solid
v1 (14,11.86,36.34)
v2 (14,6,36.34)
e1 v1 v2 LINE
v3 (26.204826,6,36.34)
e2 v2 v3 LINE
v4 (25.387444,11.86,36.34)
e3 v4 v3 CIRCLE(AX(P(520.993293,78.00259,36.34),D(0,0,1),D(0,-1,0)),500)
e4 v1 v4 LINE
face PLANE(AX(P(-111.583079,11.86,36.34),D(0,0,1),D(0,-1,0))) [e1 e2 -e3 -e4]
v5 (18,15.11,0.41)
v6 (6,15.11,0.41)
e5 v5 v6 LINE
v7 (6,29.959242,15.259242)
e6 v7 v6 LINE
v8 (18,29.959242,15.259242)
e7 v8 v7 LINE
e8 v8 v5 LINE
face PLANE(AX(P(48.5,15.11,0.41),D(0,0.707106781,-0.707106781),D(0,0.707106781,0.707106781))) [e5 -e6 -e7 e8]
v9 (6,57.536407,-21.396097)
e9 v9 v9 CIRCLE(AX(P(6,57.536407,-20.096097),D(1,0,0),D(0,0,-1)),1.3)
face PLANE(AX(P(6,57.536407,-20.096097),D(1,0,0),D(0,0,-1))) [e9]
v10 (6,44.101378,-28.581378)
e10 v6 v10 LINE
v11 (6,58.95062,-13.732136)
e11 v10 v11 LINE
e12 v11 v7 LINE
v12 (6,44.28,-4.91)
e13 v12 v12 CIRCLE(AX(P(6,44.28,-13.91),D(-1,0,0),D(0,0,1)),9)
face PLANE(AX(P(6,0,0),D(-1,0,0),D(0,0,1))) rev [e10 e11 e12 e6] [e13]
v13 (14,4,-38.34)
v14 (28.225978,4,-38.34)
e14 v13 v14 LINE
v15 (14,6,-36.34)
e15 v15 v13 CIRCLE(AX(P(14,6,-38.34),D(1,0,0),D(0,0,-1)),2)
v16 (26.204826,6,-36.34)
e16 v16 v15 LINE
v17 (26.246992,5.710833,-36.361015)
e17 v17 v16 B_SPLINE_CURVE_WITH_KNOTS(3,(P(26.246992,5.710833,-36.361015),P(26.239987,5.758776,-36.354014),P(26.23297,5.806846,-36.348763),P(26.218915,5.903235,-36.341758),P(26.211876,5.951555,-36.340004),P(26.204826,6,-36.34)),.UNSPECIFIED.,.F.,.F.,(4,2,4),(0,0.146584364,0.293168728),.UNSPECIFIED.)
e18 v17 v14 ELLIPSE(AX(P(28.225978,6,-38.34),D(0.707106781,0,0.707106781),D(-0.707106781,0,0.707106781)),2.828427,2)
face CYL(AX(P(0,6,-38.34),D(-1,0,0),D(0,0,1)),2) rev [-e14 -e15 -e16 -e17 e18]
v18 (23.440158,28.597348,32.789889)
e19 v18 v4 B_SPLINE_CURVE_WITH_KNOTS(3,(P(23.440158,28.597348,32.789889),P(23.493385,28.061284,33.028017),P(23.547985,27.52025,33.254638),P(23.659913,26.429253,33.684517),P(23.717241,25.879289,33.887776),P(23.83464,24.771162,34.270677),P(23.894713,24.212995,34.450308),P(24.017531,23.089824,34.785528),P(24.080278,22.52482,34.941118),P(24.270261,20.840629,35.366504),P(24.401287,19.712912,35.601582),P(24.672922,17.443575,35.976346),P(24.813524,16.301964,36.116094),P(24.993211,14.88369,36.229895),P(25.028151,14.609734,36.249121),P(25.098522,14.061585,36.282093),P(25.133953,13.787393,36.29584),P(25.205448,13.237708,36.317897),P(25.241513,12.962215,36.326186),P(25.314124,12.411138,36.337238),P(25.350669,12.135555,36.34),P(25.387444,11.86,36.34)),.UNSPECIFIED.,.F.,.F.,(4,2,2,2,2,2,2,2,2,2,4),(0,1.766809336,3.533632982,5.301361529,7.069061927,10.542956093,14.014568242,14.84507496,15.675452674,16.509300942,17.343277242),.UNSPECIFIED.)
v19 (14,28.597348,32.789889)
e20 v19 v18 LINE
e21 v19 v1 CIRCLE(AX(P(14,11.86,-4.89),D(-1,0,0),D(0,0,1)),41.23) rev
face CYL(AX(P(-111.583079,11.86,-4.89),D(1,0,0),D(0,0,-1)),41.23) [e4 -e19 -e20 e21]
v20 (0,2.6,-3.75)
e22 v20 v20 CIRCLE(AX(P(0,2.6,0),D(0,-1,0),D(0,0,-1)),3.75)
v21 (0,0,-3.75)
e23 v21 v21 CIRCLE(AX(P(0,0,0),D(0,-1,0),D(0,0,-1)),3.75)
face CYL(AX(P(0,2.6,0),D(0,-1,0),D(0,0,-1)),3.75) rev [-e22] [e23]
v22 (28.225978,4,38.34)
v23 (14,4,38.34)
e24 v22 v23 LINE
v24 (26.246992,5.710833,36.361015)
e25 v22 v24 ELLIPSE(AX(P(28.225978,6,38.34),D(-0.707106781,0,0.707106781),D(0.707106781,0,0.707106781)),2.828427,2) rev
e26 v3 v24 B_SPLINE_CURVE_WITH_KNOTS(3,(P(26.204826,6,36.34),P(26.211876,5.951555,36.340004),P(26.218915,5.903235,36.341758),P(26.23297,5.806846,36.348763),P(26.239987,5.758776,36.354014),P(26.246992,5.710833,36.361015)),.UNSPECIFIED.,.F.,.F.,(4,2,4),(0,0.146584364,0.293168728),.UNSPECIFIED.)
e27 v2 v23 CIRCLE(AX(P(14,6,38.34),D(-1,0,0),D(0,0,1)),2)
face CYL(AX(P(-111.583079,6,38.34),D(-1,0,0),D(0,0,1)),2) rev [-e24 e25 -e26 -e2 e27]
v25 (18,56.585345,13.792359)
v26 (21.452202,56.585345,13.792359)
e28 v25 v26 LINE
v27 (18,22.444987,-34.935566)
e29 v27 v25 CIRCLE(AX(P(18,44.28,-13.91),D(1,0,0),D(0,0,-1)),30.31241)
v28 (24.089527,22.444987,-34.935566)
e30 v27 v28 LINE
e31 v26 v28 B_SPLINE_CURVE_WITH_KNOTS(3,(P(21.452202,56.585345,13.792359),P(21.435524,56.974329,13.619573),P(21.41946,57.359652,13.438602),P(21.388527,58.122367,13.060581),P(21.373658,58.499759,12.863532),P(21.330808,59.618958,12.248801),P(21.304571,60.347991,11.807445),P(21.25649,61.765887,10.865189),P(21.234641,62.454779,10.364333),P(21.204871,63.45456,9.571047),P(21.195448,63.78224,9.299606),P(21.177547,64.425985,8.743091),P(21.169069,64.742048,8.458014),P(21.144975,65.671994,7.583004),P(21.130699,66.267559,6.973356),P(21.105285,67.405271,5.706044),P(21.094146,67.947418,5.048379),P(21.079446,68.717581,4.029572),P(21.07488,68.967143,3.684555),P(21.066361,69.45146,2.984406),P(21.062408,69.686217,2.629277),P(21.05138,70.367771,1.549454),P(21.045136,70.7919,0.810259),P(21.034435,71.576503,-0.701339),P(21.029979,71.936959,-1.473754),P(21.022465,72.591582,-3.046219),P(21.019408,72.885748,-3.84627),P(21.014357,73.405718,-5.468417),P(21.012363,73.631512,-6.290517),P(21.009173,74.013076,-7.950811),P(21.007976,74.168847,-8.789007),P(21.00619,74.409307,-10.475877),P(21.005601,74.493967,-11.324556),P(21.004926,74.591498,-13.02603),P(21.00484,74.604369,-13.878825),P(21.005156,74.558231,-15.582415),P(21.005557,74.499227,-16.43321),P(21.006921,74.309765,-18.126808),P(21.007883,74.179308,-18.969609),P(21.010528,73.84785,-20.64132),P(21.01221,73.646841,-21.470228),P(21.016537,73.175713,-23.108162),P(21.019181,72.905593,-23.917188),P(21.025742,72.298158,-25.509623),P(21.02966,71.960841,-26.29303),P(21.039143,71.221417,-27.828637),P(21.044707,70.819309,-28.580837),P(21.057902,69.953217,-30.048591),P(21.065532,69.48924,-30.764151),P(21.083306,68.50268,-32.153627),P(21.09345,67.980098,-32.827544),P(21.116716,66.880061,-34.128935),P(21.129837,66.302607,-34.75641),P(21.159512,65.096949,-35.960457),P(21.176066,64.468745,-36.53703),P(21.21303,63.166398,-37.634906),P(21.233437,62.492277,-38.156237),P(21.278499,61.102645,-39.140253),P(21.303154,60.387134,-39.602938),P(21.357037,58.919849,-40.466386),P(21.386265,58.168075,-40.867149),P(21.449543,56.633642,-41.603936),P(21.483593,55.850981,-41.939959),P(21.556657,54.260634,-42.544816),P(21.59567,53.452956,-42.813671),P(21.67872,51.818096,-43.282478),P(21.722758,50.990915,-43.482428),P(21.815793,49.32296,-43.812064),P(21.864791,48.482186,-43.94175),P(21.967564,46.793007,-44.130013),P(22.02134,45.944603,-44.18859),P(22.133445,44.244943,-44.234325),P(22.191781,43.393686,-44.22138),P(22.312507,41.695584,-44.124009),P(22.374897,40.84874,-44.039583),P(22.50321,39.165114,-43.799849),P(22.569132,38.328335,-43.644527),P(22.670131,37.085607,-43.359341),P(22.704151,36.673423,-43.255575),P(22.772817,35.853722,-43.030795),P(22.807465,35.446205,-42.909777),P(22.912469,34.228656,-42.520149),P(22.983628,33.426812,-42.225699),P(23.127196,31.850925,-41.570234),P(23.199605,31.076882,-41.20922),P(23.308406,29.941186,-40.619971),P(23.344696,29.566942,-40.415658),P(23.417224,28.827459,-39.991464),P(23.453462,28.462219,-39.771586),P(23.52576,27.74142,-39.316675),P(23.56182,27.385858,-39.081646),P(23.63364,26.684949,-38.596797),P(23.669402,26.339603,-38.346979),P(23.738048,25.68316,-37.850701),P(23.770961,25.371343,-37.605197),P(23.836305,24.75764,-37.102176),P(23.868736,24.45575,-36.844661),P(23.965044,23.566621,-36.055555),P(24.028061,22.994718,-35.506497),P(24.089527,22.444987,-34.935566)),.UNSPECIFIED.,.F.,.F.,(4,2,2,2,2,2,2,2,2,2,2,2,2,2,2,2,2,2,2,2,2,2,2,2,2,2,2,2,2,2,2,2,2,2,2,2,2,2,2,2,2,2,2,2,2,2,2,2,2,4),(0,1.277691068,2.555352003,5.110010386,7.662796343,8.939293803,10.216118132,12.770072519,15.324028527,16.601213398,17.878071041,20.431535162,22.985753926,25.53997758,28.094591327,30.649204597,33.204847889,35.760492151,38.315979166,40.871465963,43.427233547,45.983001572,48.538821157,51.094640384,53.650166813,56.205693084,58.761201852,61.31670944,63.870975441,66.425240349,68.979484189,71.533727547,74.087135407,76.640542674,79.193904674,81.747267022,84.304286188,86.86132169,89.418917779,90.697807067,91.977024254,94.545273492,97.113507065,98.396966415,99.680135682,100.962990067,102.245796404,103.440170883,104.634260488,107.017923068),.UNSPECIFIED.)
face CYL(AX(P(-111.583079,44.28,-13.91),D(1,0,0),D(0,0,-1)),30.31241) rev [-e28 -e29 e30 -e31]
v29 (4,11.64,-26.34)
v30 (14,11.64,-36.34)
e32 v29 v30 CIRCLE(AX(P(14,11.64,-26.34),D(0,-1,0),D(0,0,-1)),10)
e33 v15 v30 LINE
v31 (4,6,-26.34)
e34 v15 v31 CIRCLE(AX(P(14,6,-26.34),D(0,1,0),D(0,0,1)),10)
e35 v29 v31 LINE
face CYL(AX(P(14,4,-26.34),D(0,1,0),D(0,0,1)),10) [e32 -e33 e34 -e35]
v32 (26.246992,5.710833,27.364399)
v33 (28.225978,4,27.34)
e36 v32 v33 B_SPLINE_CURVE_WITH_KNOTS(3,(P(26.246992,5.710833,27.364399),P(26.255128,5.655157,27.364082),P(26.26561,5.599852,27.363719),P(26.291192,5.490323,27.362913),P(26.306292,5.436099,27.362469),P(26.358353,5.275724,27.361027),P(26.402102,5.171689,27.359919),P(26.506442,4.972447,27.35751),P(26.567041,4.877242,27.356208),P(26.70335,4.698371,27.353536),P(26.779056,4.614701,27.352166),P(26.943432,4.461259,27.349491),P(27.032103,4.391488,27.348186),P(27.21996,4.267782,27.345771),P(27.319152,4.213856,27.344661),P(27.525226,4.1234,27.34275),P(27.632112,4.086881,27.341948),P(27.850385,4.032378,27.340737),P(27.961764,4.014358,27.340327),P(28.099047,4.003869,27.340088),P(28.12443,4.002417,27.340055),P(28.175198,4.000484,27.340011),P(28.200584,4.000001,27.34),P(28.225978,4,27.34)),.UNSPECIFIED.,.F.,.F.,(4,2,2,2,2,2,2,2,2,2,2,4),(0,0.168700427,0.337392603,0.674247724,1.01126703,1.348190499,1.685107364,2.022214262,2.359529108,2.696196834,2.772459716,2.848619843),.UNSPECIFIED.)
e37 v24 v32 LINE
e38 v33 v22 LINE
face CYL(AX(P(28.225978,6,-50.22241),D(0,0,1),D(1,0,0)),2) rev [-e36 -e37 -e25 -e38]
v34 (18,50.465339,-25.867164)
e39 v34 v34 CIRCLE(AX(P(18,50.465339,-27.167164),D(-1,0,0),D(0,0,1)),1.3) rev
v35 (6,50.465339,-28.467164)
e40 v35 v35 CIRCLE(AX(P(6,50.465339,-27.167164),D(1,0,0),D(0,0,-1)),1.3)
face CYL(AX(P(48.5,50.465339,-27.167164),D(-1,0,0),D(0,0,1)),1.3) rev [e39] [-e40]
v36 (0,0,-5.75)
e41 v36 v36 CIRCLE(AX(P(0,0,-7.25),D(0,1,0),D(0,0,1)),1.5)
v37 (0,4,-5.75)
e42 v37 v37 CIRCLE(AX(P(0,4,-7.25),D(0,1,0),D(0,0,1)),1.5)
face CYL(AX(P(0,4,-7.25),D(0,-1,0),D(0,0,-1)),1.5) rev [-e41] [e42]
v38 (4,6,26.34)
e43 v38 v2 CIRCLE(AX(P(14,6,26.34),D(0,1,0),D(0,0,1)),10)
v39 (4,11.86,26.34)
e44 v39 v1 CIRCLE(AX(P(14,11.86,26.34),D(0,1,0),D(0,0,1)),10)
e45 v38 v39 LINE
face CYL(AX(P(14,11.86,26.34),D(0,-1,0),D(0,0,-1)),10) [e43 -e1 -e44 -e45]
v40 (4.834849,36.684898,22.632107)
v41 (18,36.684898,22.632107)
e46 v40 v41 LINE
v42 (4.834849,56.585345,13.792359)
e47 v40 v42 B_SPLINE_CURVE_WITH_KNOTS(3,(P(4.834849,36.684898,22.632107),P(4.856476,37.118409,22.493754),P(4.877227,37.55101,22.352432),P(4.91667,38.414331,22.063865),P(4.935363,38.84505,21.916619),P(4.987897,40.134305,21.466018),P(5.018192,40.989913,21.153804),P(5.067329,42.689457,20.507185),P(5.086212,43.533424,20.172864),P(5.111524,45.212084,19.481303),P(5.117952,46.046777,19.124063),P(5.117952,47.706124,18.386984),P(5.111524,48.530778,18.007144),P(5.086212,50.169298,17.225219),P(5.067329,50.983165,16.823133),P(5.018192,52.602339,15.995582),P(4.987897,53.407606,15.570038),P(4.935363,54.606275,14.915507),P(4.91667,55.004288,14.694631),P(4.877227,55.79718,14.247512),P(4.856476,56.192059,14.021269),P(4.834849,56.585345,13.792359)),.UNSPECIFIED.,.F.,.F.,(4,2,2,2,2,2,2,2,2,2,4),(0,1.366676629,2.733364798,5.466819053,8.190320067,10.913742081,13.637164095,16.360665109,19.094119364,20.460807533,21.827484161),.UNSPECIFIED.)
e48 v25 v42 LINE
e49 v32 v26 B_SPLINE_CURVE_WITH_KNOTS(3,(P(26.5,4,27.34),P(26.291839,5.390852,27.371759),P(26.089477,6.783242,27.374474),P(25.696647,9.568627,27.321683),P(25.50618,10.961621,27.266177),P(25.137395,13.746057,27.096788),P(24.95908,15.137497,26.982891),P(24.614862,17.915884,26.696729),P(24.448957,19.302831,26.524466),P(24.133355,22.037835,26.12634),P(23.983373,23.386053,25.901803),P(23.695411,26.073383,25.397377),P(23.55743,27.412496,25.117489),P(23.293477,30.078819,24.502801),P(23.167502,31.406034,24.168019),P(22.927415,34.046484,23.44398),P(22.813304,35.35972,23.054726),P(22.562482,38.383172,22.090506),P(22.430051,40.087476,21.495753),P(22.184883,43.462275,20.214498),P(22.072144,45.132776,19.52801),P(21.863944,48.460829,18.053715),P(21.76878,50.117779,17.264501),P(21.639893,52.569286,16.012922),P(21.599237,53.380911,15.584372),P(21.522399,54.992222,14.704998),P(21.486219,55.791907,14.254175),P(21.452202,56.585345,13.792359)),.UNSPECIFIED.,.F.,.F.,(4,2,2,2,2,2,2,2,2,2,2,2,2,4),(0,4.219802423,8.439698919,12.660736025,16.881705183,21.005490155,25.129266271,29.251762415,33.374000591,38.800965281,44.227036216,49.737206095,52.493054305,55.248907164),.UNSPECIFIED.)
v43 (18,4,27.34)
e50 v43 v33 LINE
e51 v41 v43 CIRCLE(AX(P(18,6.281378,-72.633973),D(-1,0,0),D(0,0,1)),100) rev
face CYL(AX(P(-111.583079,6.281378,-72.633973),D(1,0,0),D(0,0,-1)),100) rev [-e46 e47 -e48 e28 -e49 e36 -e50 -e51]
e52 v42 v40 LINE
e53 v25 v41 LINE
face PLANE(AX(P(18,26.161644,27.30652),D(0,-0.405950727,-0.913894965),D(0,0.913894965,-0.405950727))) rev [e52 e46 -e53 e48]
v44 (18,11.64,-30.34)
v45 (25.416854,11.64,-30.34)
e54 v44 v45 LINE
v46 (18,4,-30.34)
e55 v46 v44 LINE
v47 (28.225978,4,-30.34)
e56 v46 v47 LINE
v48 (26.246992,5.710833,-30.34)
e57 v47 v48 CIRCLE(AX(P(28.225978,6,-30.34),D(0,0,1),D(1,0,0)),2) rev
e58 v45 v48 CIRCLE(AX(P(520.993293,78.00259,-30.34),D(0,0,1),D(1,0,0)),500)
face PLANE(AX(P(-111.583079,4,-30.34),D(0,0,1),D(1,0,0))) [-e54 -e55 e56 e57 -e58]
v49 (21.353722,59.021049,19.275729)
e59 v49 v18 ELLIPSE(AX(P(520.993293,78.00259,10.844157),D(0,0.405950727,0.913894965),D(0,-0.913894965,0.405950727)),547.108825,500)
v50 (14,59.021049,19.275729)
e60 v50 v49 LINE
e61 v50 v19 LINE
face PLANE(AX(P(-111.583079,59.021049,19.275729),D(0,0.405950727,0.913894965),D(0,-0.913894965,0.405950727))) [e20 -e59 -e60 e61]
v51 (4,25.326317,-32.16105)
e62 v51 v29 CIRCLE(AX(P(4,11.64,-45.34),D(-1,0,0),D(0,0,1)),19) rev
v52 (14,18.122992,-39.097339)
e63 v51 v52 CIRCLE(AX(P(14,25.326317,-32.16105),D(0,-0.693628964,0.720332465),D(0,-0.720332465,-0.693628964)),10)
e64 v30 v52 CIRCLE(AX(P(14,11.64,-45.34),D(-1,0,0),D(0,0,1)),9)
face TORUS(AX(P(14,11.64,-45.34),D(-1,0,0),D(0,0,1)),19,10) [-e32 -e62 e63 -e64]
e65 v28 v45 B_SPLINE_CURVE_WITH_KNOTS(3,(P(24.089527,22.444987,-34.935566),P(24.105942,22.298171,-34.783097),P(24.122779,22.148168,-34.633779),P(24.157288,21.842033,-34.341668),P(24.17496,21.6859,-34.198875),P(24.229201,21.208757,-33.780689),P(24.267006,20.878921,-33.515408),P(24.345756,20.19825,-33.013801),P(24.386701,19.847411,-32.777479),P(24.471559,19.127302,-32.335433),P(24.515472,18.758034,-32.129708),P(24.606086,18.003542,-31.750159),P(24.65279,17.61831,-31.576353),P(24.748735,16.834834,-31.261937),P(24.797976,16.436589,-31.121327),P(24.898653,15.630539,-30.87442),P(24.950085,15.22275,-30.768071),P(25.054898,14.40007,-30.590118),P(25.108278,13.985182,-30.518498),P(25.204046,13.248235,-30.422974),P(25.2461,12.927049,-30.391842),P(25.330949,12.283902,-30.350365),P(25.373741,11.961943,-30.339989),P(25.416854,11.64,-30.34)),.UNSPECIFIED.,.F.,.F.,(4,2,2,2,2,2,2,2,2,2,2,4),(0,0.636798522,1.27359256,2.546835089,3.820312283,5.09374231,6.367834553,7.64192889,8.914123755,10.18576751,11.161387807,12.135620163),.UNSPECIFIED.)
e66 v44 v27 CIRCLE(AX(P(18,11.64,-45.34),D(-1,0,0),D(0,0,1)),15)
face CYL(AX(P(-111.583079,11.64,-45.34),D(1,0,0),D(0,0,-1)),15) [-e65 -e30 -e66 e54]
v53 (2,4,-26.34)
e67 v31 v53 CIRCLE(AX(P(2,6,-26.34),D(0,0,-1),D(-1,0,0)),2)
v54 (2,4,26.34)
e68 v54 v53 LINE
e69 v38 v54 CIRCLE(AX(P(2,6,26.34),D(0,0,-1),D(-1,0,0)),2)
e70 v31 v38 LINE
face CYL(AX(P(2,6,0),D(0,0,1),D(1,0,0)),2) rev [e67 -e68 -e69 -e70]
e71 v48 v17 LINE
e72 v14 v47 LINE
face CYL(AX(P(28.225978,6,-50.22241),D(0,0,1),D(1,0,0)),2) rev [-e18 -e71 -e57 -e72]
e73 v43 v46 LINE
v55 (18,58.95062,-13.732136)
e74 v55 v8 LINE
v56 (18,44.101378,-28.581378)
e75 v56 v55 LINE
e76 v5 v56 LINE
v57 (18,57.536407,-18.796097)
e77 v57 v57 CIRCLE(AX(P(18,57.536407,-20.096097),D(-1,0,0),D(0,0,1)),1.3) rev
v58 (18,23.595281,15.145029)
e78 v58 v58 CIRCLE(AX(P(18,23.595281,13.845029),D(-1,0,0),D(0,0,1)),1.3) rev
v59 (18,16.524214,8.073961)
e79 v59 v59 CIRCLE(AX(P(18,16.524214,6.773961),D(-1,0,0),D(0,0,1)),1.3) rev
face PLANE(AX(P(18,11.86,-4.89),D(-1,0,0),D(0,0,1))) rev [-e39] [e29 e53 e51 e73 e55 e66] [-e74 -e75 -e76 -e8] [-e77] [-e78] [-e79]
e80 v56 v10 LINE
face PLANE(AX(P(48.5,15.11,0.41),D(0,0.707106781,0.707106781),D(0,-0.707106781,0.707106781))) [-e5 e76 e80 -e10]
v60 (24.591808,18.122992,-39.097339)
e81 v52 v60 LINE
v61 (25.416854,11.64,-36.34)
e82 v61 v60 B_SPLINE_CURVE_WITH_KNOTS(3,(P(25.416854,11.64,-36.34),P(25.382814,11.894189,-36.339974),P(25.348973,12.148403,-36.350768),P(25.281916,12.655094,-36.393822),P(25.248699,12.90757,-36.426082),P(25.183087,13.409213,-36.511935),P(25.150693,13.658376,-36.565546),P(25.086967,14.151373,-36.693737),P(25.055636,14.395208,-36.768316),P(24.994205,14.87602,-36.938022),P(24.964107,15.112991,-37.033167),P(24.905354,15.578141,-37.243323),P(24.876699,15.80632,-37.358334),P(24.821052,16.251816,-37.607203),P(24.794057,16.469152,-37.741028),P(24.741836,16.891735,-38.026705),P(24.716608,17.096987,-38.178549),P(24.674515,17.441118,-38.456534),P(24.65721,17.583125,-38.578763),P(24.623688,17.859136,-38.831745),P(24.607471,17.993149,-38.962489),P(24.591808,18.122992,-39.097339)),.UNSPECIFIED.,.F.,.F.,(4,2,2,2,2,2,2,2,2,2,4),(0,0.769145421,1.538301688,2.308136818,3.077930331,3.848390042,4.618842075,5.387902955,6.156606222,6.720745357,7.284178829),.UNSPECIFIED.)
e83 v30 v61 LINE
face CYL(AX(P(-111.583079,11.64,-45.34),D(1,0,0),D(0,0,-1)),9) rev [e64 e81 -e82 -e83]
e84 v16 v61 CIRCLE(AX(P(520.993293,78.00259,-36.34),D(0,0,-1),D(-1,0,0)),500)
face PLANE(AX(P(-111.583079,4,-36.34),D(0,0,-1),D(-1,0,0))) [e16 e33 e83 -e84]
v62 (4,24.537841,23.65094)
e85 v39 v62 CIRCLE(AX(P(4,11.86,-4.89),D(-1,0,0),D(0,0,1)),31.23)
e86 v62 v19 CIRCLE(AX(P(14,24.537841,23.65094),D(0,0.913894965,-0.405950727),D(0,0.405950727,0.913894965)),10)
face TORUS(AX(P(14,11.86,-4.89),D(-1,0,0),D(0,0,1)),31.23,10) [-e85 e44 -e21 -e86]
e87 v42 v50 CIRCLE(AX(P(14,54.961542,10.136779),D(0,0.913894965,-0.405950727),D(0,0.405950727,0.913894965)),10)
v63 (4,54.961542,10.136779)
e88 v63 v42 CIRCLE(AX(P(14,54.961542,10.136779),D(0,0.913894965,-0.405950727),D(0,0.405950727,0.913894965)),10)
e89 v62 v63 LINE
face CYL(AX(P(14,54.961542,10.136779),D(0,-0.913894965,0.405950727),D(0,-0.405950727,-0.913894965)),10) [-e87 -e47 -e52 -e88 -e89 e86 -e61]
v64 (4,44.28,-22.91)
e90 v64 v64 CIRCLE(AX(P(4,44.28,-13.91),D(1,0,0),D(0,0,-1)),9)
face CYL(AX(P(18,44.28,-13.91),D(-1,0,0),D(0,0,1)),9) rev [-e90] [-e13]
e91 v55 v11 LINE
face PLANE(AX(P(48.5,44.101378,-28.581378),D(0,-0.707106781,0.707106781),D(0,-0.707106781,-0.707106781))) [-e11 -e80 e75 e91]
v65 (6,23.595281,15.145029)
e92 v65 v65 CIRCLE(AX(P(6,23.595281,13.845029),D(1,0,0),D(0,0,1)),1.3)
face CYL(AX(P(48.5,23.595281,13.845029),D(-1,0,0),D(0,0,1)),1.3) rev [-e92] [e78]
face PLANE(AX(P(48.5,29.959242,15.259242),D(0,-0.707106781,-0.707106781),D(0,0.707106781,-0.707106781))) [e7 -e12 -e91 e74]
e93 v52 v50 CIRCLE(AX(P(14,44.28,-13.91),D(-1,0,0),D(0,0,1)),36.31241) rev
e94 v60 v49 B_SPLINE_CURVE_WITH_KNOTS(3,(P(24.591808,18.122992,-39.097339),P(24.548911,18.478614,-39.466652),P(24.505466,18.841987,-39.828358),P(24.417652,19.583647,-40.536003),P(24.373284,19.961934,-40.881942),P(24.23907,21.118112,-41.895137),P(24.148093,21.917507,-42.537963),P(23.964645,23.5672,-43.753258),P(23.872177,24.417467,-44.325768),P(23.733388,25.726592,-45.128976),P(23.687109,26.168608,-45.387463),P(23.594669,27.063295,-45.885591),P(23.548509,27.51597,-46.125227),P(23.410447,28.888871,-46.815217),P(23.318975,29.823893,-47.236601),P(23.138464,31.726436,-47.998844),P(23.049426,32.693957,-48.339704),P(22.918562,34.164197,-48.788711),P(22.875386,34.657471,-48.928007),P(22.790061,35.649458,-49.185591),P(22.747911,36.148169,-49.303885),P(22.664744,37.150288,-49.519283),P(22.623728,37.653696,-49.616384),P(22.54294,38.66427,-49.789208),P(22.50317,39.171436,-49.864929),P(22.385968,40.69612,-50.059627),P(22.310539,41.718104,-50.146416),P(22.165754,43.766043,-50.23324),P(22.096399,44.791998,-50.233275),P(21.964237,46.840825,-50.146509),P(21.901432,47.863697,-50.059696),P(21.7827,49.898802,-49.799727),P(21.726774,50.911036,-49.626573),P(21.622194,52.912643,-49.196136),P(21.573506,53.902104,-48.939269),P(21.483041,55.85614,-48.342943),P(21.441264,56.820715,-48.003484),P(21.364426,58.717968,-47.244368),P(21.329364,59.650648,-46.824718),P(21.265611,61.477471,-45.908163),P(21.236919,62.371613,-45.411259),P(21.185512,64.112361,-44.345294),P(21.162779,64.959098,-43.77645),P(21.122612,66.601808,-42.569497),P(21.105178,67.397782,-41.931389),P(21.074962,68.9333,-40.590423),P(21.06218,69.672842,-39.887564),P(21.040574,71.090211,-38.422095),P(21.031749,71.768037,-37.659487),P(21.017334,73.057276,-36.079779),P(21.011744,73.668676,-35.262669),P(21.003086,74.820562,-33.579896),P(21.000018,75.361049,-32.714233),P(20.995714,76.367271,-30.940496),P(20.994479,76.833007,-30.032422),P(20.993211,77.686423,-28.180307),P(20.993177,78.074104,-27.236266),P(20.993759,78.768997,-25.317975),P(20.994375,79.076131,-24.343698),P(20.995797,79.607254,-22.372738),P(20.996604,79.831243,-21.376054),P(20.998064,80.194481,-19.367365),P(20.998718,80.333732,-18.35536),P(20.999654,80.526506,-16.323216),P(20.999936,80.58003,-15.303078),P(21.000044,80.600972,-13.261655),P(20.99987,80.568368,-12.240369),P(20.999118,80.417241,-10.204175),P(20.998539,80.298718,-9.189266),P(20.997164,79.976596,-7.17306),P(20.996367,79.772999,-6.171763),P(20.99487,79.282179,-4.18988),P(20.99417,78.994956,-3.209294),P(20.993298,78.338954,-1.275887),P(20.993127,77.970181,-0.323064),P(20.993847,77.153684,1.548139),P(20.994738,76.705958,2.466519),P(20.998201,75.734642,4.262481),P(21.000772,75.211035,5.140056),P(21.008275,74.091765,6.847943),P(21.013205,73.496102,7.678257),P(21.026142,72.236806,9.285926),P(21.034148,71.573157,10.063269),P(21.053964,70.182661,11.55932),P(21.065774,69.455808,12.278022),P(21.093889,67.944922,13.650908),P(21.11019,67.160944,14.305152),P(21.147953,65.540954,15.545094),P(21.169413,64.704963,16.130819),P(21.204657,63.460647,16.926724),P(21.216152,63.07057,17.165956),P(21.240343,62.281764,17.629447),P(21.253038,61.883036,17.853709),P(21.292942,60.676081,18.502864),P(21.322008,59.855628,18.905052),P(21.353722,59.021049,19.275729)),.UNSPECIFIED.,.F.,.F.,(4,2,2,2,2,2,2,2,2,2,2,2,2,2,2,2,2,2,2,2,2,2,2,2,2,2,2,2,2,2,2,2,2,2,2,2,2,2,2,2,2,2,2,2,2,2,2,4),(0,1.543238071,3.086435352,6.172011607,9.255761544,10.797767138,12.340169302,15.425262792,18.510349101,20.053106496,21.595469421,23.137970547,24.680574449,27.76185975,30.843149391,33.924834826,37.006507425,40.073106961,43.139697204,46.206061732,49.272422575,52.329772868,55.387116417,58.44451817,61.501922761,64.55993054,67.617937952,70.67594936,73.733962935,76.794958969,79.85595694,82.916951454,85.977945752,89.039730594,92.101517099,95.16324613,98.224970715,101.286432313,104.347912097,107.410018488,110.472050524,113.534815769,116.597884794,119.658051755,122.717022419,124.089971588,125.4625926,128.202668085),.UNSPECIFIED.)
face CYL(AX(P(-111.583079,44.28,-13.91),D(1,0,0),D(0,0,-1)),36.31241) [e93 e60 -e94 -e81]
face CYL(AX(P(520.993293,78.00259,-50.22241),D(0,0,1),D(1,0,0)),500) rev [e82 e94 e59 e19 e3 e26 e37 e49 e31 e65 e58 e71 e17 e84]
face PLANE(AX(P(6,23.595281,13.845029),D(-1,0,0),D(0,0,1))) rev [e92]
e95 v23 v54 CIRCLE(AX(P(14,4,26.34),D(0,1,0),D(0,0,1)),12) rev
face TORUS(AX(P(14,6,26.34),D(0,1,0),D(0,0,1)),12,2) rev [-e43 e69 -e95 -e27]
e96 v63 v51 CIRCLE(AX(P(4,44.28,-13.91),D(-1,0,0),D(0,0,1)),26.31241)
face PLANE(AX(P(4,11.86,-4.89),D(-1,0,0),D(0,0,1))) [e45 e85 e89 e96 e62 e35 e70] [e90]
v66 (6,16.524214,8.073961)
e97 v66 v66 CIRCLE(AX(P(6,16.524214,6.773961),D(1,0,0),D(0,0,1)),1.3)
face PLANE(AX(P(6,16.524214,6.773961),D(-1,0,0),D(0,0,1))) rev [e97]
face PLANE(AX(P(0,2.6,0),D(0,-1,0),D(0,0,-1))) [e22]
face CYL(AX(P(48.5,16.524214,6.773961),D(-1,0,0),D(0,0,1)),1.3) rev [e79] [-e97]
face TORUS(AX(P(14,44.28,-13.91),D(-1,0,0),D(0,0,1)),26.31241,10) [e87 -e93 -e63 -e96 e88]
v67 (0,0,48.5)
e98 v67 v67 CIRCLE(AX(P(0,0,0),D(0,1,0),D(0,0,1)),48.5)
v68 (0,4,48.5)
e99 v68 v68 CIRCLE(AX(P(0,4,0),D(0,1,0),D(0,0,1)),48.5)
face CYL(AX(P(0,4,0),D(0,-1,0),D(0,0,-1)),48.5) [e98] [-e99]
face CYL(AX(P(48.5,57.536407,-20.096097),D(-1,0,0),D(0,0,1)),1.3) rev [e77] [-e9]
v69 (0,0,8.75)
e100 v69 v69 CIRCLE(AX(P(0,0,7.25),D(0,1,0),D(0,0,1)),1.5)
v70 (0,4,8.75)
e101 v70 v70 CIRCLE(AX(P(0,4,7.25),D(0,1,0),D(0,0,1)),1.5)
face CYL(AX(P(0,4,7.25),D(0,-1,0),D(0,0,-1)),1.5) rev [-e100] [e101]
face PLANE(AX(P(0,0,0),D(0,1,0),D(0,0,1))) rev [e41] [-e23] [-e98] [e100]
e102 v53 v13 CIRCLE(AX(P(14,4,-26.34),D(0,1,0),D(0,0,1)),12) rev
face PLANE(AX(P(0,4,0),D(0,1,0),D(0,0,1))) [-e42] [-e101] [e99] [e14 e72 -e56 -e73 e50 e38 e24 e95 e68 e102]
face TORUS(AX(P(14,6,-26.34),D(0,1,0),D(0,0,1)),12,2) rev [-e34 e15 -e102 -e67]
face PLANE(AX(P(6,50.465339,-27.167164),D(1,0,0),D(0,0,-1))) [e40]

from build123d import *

# Parameters (mm, degrees)
SKETCH1_R                       = 48.5
SKETCH1_R_2                     = 1.5
BOSS_EXTRUDE3_DEPTH             = 4
BOSS_EXTRUDE4_START             = 4
SKETCH3_R                       = 9
BOSS_EXTRUDE4_DEPTH             = 14
CUT_EXTRUDE2_START              = 6
SKETCH5_R                       = 1.3
CUT_EXTRUDE2_DEPTH              = 96.333743786
BOSS_EXTRUDE5_DEPTH             = 9
BOSS_EXTRUDE5_DIRECTION_2_REACH = 113.079
CUT_EXTRUDE3_DEPTH              = 107.628687584
CUT_EXTRUDE3_DEPTH_BACK         = 107.628687584
FILLET1_R                       = 10
FILLET2_R                       = 2
SKETCH11_R                      = 3.75
CUT_EXTRUDE4_DEPTH              = 2.6


with BuildPart() as part:
    # Sketch1 → Boss-Extrude3 (new body)
    with BuildSketch(Plane(origin=(0, 0, 0), x_dir=(1, 0, 0), z_dir=(0, 1, 0))):
        with Locations(Location((0, 0, 0), (0, 0, 270))):
            Circle(SKETCH1_R)
        with Locations(Location((0, 7.25, 0), (0, 0, 270))):
            Circle(SKETCH1_R_2, mode=Mode.SUBTRACT)
        with Locations(Location((0, -7.25, 0), (0, 0, 270))):
            Circle(SKETCH1_R_2, mode=Mode.SUBTRACT)
    extrude(amount=BOSS_EXTRUDE3_DEPTH)

    # Sketch3 → Boss-Extrude4 (add)
    with BuildSketch(Plane(origin=(0, 0, 0), x_dir=(0, 0, -1), z_dir=(1, 0, 0)).offset(BOSS_EXTRUDE4_START)):
        with BuildLine():
            Line((30.34, 4), (-30.34, 4))
            Line((-30.34, 4), (-30.34, 11.86))
            ThreePointArc((-30.34, 11.86), (-29.573286886, 19.169908139), (-27.306519614, 26.161644128))
            Line((-27.306519614, 26.161644128), (-13.792358873, 56.58534489))
            ThreePointArc((-13.792358873, 56.58534489), (31.303559207, 69.105517077), (34.935565542, 22.444986978))
            ThreePointArc((34.935565542, 22.444986978), (31.536621485, 17.510838233), (30.34, 11.64))
            Line((30.34, 11.64), (30.34, 4))
        make_face()
        with Locations((13.91, 44.28)):
            Circle(SKETCH3_R, mode=Mode.SUBTRACT)
    extrude(amount=BOSS_EXTRUDE4_DEPTH)

    # Sketch5 → Cut-Extrude2 (cut, through all)
    with BuildSketch(Plane(origin=(0, 0, 0), x_dir=(0, 0, -1), z_dir=(1, 0, 0)).offset(CUT_EXTRUDE2_START)):
        with Locations(Location((27.167164466, 50.465339059, 0), (0, 0, 180))):
            Circle(SKETCH5_R)
        with Locations(Location((20.096096654, 57.536406871, 0), (0, 0, 180))):
            Circle(SKETCH5_R)
        with Locations(Location((-6.773961031, 16.524213562, 0), (0, 0, 180))):
            Circle(SKETCH5_R)
        with Locations(Location((-13.845028843, 23.595281374, 0), (0, 0, 180))):
            Circle(SKETCH5_R)
        Polygon((-0.41, 15.11), (28.581378029, 44.101378029), (13.732135624, 58.950620434), (-15.259242405, 29.959242405), align=None)
    extrude(amount=CUT_EXTRUDE2_DEPTH, mode=Mode.SUBTRACT)

    # Sketch9 → Boss-Extrude5 (add)
    with BuildSketch(Plane(origin=(18, 0, 0), x_dir=(0, 0, -1), z_dir=(1, 0, 0))):
        with BuildLine():
            Line((30.34, 4), (30.34, 11.64))
            ThreePointArc((30.34, 11.64), (31.536621485, 17.510838233), (34.935565542, 22.444986978))
            ThreePointArc((34.935565542, 22.444986978), (31.303559207, 69.105517077), (-13.792358873, 56.58534489))
            ThreePointArc((-13.792358873, 56.58534489), (-24.20389685, 31.229863028), (-27.34, 4))
            Line((-27.34, 4), (-36.34, 4))
            Line((-36.34, 4), (-36.34, 11.86))
            ThreePointArc((-36.34, 11.86), (-35.442708439, 20.414854175), (-32.789889403, 28.597348492))
            Line((-32.789889403, 28.597348492), (-19.275728663, 59.021049255))
            ThreePointArc((-19.275728663, 59.021049255), (34.746418262, 74.019448449), (39.097339325, 18.122992187))
            ThreePointArc((39.097339325, 18.122992187), (37.057972891, 15.16250294), (36.34, 11.64))
            Line((36.34, 11.64), (36.34, 4))
            Line((36.34, 4), (30.34, 4))
        make_face()
    extrude(amount=BOSS_EXTRUDE5_DEPTH)

    # Boss-Extrude5 direction 2: up to this face of the body (flat: up to its plane)
    boss_extrude5_direction_2_end = Plane(part.part.faces().sort_by_distance((4, 35.761181815, -7.797700276))[0])
    # Sketch9 → Boss-Extrude5 direction 2 (add, up to the picked face)
    with BuildSketch(Plane(origin=(18, 0, 0), x_dir=(0, 0, -1), z_dir=(1, 0, 0)), mode=Mode.PRIVATE) as boss_extrude5_direction_2_sk1:
        with BuildLine():
            Line((30.34, 4), (30.34, 11.64))
            ThreePointArc((30.34, 11.64), (31.536621485, 17.510838233), (34.935565542, 22.444986978))
            ThreePointArc((34.935565542, 22.444986978), (31.303559207, 69.105517077), (-13.792358873, 56.58534489))
            ThreePointArc((-13.792358873, 56.58534489), (-24.20389685, 31.229863028), (-27.34, 4))
            Line((-27.34, 4), (-36.34, 4))
            Line((-36.34, 4), (-36.34, 11.86))
            ThreePointArc((-36.34, 11.86), (-35.442708439, 20.414854175), (-32.789889403, 28.597348492))
            Line((-32.789889403, 28.597348492), (-19.275728663, 59.021049255))
            ThreePointArc((-19.275728663, 59.021049255), (34.746418262, 74.019448449), (39.097339325, 18.122992187))
            ThreePointArc((39.097339325, 18.122992187), (37.057972891, 15.16250294), (36.34, 11.64))
            Line((36.34, 11.64), (36.34, 4))
            Line((36.34, 4), (30.34, 4))
        make_face()
    boss_extrude5_direction_2_tool1 = split(extrude(boss_extrude5_direction_2_sk1.sketch, amount=-BOSS_EXTRUDE5_DIRECTION_2_REACH, mode=Mode.PRIVATE), bisect_by=boss_extrude5_direction_2_end, keep=Keep.BOTH, mode=Mode.PRIVATE)
    add(boss_extrude5_direction_2_tool1.solids().sort_by(Axis((18, 43.339989, 24.976501), (-1, 0, 0)))[0])

    # Sketch10 → Cut-Extrude3 (cut, two sides: drawn at the far end of the back side and taken through both)
    with BuildSketch(Plane.XY.offset(-CUT_EXTRUDE3_DEPTH_BACK)):
        with BuildLine():
            Line((27, 80.59241), (21, 80.59241))
            ThreePointArc((21, 80.59241), (22.277450308, 42.190463148), (26.5, 4))
            Line((26.5, 4), (27, 4))
            Line((27, 4), (27, 80.59241))
        make_face()
    extrude(amount=CUT_EXTRUDE3_DEPTH + CUT_EXTRUDE3_DEPTH_BACK, mode=Mode.SUBTRACT)

    # Fillet1
    # the kernel refuses this fillet: 10 mm, written as the material it takes off along each edge
    with BuildSketch(Plane(origin=(4, 11.64, -36.34), x_dir=(0, 0, 1), z_dir=(0, -1, 0))) as fillet1_piece_1:
        with BuildLine():
            CenterArc((FILLET1_R, -FILLET1_R), FILLET1_R, 90, 90)
            Line((0, -FILLET1_R), (0, 0))
            Line((0, 0), (FILLET1_R, 0))
        make_face()
    extrude(amount=7.64, mode=Mode.SUBTRACT)
    with BuildSketch(Plane(origin=(4, 11.64, -45.34), x_dir=(0, 0.7203324652134895, 0.6936289638988969), z_dir=(0, 0.6936289638988969, -0.7203324652134895))) as fillet1_piece_2:
        with BuildLine():
            CenterArc((9 + FILLET1_R, FILLET1_R), FILLET1_R, 180, 90)
            Line((9, FILLET1_R), (9, 0))
            Line((9, 0), (9 + FILLET1_R, 0))
        make_face()
    revolve(axis=Axis((4, 11.64, -45.34), (1, 0, 0)), revolution_arc=46.081936205, mode=Mode.SUBTRACT)
    with BuildSketch(Plane(origin=(4, 44.28, -13.91), x_dir=(0, -0.7203324652134897, -0.6936289638988965), z_dir=(0, -0.6936289638988965, 0.7203324652134897))) as fillet1_piece_3:
        with BuildLine():
            CenterArc((36.31241 - FILLET1_R, FILLET1_R), FILLET1_R, 270, 90)
            Line((36.31241, FILLET1_R), (36.31241, 0))
            Line((36.31241, 0), (36.31241 - FILLET1_R, 0))
        make_face()
    revolve(axis=Axis((4, 44.28, -13.91), (1, 0, 0)), revolution_arc=202.131217863, mode=Mode.SUBTRACT)
    with BuildSketch(Plane(origin=(4, 28.597348492, 32.789889403), x_dir=(0, -0.40595072743967076, -0.913894964911834), z_dir=(0, 0.913894964911834, -0.4059507274396708))) as fillet1_piece_4:
        with BuildLine():
            CenterArc((FILLET1_R, -FILLET1_R), FILLET1_R, 90, 90)
            Line((0, -FILLET1_R), (0, 0))
            Line((0, 0), (FILLET1_R, 0))
        make_face()
    extrude(amount=33.290150324, mode=Mode.SUBTRACT)
    with BuildSketch(Plane(origin=(4, 11.86, -4.89), x_dir=(0, 0.4059507274396698, 0.9138949649118343), z_dir=(0, 0.9138949649118343, -0.4059507274396698))) as fillet1_piece_5:
        with BuildLine():
            CenterArc((41.23 - FILLET1_R, FILLET1_R), FILLET1_R, 270, 90)
            Line((41.23, FILLET1_R), (41.23, 0))
            Line((41.23, 0), (41.23 - FILLET1_R, 0))
        make_face()
    revolve(axis=Axis((4, 11.86, -4.89), (1, 0, 0)), revolution_arc=23.950718343, mode=Mode.SUBTRACT)
    with BuildSketch(Plane(origin=(4, 4, 36.34), x_dir=(0, 0, -1), z_dir=(0, 1, 0))) as fillet1_piece_6:
        with BuildLine():
            CenterArc((FILLET1_R, -FILLET1_R), FILLET1_R, 90, 90)
            Line((0, -FILLET1_R), (0, 0))
            Line((0, 0), (FILLET1_R, 0))
        make_face()
    extrude(amount=7.86, mode=Mode.SUBTRACT)

    # Fillet2
    fillet2_edges = [part.edges().sort_by_distance(p)[0] for p in [
        (20.25, 4, -36.34),
        (20.25, 4, 36.34),
        (6.928932188, 4, 33.411067812),
        (4, 4, 0),
        (6.928932188, 4, -33.411067812),
    ]]
    fillet(fillet2_edges, radius=FILLET2_R)
    fillet2_2_edges = [part.edges().sort_by_distance(p)[0] for p in [
        (26.5, 4, -33.34),
    ]]
    fillet(fillet2_2_edges, radius=FILLET2_R)
    fillet2_3_edges = [part.edges().sort_by_distance(p)[0] for p in [
        (26.5, 4, 31.84),
    ]]
    fillet(fillet2_3_edges, radius=FILLET2_R)

    # Sketch11 → Cut-Extrude4 (cut)
    with BuildSketch(Plane.XZ):
        with Locations(Location((0, 0, 0), (0, 0, 270))):
            Circle(SKETCH11_R)
    extrude(amount=-CUT_EXTRUDE4_DEPTH, mode=Mode.SUBTRACT)


solid = part.part
